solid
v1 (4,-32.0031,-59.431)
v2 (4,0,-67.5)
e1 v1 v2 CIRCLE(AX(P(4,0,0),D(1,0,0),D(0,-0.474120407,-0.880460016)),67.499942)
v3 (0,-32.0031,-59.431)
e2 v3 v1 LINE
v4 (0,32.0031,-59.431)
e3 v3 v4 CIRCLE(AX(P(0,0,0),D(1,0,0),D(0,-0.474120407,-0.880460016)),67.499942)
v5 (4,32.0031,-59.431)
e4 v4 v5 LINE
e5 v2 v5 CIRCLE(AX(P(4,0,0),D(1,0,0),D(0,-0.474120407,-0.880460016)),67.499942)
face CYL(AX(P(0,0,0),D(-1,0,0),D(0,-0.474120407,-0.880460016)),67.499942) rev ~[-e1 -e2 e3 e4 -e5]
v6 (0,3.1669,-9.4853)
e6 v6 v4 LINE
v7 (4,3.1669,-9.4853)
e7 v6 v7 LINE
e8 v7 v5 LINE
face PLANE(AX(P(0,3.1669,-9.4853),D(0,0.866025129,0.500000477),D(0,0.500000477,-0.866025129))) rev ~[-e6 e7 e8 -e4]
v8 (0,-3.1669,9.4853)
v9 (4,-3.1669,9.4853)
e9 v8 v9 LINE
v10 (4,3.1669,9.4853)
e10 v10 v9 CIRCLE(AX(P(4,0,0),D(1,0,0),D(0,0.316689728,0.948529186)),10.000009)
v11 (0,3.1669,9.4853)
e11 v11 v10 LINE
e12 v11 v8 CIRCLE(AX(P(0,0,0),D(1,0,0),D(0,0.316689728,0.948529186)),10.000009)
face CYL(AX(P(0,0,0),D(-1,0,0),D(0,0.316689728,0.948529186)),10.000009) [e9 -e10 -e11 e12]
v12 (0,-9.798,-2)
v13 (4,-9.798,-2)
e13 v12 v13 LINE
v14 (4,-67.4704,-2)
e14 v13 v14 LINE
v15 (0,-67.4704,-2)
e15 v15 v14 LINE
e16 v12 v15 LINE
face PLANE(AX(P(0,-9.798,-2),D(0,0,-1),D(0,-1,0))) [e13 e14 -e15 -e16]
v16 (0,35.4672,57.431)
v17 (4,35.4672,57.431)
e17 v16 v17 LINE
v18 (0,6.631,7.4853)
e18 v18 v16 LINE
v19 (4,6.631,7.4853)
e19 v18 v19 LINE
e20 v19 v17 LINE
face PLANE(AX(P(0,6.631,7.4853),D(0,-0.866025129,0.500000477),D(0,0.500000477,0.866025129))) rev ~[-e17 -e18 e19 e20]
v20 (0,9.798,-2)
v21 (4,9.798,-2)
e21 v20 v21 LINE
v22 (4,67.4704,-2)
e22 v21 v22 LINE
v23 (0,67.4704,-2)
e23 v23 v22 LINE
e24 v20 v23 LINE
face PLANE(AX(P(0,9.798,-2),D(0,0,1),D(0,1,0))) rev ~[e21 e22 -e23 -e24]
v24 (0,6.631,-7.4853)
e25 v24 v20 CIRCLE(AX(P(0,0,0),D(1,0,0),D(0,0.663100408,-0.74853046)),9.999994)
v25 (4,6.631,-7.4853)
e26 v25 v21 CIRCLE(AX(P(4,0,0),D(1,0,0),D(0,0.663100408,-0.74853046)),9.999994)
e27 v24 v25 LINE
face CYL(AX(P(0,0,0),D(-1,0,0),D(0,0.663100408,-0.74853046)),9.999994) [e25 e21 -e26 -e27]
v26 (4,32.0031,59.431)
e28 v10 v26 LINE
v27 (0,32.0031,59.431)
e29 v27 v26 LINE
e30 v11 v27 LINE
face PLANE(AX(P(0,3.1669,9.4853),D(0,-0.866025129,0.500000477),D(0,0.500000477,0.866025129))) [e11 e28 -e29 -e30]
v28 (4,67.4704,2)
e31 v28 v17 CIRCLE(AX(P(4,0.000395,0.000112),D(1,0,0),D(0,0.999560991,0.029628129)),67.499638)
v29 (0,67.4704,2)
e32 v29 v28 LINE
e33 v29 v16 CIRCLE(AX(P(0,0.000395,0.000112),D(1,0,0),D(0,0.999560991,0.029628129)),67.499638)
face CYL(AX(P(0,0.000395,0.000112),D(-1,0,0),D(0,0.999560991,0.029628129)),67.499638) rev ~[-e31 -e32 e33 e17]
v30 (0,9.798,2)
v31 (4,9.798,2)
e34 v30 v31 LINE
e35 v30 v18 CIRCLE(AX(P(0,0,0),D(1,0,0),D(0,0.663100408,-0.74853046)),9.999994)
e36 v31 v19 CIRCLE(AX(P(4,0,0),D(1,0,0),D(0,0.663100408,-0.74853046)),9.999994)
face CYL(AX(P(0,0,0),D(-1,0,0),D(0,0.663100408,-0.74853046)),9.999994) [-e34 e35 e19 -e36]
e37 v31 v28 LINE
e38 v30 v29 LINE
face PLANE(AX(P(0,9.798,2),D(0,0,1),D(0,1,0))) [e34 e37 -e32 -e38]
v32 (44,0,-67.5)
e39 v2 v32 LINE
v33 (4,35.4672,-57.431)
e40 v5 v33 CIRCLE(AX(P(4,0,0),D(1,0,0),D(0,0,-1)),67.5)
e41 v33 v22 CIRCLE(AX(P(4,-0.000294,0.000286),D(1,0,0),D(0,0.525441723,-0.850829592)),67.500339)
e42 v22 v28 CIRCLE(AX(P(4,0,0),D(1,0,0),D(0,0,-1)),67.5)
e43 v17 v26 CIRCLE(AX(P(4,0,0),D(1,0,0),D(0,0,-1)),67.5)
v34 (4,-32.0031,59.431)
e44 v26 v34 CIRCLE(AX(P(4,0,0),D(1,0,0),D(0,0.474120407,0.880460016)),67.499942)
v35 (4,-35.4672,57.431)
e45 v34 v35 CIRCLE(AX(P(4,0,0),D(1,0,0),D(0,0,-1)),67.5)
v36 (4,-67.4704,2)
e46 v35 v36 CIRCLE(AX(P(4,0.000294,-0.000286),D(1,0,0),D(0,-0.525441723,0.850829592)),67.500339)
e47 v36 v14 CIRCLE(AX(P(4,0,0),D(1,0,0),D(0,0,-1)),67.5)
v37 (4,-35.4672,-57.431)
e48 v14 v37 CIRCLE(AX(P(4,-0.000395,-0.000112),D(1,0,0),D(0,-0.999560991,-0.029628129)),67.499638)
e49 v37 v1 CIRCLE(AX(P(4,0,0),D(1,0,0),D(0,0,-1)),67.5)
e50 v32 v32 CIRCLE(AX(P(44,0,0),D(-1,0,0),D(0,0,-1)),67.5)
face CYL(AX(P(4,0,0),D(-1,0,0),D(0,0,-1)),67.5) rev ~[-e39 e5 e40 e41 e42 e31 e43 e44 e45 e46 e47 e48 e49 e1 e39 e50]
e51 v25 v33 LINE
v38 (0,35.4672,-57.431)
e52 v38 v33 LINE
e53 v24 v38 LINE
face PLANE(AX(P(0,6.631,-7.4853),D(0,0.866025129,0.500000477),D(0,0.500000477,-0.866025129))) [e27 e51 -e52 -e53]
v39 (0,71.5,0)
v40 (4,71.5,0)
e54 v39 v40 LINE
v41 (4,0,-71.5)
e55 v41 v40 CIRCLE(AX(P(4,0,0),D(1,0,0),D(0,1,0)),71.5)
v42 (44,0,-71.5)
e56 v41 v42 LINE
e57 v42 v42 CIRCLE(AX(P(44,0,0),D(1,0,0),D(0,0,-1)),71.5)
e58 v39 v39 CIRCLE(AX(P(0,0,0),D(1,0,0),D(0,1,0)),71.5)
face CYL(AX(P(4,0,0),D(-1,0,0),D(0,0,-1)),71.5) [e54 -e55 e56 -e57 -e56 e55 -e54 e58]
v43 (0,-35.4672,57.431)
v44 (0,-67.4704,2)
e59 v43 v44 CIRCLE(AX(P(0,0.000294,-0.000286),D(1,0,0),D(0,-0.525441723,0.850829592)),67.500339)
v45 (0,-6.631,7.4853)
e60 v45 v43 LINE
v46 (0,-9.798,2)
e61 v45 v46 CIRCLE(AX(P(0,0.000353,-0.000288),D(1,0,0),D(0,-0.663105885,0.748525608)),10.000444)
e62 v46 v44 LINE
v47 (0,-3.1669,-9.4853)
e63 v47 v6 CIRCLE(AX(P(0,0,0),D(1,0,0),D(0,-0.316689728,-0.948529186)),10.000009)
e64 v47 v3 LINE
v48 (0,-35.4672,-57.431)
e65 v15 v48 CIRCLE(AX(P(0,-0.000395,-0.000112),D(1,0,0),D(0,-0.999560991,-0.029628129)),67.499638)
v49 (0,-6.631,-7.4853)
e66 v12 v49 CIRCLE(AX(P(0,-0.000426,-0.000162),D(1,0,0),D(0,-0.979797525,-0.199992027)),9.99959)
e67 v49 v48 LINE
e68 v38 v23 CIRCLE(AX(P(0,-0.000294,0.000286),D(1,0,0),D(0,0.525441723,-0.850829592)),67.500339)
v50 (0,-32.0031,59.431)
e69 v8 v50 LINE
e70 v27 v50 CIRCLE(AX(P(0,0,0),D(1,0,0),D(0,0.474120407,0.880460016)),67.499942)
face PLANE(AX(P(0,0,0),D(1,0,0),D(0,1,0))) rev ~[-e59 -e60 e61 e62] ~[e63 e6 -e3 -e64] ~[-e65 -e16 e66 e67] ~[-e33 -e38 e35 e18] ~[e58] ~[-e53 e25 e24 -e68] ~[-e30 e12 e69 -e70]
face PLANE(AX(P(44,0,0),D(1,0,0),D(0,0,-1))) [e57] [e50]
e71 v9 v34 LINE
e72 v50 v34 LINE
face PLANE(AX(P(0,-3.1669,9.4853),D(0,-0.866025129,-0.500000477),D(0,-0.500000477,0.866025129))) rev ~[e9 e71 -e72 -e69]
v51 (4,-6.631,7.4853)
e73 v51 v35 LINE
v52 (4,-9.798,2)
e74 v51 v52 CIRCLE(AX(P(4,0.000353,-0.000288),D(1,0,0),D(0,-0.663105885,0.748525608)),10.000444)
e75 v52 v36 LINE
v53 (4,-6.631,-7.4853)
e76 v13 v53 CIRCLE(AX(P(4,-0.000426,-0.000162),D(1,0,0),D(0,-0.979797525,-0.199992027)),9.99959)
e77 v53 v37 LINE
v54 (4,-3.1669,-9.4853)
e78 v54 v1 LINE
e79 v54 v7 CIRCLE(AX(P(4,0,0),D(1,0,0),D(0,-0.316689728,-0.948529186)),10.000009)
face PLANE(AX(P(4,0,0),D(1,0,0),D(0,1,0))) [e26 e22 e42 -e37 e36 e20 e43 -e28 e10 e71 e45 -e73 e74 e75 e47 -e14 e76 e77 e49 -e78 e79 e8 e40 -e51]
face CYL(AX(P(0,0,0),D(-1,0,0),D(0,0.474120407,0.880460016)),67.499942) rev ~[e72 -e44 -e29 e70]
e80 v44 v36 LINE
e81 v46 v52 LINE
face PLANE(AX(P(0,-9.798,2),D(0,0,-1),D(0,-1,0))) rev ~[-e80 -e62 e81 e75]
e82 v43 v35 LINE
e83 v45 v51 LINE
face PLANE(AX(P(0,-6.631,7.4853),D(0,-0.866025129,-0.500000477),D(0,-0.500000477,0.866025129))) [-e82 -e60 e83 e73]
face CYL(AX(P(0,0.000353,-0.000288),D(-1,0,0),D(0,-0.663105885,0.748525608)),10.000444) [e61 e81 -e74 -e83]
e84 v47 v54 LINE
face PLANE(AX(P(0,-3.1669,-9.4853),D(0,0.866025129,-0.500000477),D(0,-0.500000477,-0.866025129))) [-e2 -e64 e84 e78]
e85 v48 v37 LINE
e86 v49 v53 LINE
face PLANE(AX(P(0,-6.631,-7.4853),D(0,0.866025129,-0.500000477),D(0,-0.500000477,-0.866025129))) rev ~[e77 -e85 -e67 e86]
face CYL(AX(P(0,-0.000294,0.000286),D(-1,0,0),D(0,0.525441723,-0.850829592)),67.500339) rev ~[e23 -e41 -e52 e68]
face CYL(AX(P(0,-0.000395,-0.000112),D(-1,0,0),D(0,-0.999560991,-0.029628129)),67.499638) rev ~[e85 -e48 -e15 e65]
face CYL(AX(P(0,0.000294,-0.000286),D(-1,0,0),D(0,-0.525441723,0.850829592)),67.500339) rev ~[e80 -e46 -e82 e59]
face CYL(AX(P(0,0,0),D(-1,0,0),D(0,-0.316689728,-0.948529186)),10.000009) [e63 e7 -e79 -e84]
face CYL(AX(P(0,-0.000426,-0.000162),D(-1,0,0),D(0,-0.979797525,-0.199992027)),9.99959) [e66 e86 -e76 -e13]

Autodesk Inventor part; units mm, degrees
ref_plane "YZ Plane" through (0, 0, 0) normal (1, 0, 0) x (0, 1, 0)
ref_plane "XZ Plane" through (0, 0, 0) normal (0, 1, 0) x (-1, 0, 0)
ref_plane "XY Plane" through (0, 0, 0) normal (0, 0, 1) x (1, 0, 0)
sketch "Sketch1" plane through (0, 0, 0) normal (1, 0, 0) x (0, 1, 0)
  arc A0 (35.4672, -57.431) -> (67.4704, -2) centre (0, 0) ccw
  circle A1 centre (0, 0) radius 71.5
  arc A2 (3.1669, 9.4853) -> (-3.1669, 9.4853) centre (0, 0) ccw
  line L0 (10, 0) -> (67.5, 0) construction
  line L1 (9.798, 2) -> (67.4704, 2)
  line L2 (9.798, -2) -> (67.4704, -2)
  line L3 (3.1669, 9.4853) -> (32.0031, 59.431)
  line L4 (6.631, 7.4853) -> (35.4672, 57.431)
  line L5 (-6.631, 7.4853) -> (-35.4672, 57.431)
  line L6 (-3.1669, 9.4853) -> (-32.0031, 59.431)
  line L7 (-9.798, -2) -> (-67.4704, -2)
  line L8 (-9.798, 2) -> (-67.4704, 2)
  line L9 (-3.1669, -9.4853) -> (-32.0031, -59.431)
  line L10 (-6.631, -7.4853) -> (-35.4672, -57.431)
  line L11 (6.631, -7.4853) -> (35.4672, -57.431)
  line L12 (3.1669, -9.4853) -> (32.0031, -59.431)
  arc A3 (6.631, 7.4853) -> (3.1669, 9.4853) centre (0, 0) ccw
  arc A4 (-6.631, 7.4853) -> (-9.798, 2) centre (0, 0) ccw
  arc A5 (-3.1669, 9.4853) -> (-6.631, 7.4853) centre (0, 0) ccw
  arc A6 (-9.798, 2) -> (-9.798, -2) centre (0, 0) ccw
  arc A7 (-9.798, -2) -> (-6.631, -7.4853) centre (0, 0) ccw
  arc A8 (-6.631, -7.4853) -> (-3.1669, -9.4853) centre (0, 0) ccw
  arc A9 (-3.1669, -9.4853) -> (3.1669, -9.4853) centre (0, 0) ccw
  arc A10 (3.1669, -9.4853) -> (6.631, -7.4853) centre (0, 0) ccw
  arc A11 (6.631, -7.4853) -> (6.631, 7.4853) centre (0, 0) ccw
  arc A12 (32.0031, -59.431) -> (35.4672, -57.431) centre (0, 0) ccw
  arc A13 (67.4704, -2) -> (67.4704, 2) centre (0, 0) ccw construction
  arc A14 (35.4672, 57.431) -> (32.0031, 59.431) centre (0, 0) ccw construction
  arc A15 (32.0031, 59.431) -> (-32.0031, 59.431) centre (0, 0) ccw
  arc A16 (-32.0031, 59.431) -> (-35.4672, 57.431) centre (0, 0) ccw construction
  arc A17 (-35.4672, 57.431) -> (-67.4704, 2) centre (0, 0) ccw
  arc A18 (-67.4704, 2) -> (-67.4704, -2) centre (0, 0) ccw construction
  arc A19 (-67.4704, -2) -> (-35.4672, -57.431) centre (0, 0) ccw
  arc A20 (-35.4672, -57.431) -> (-32.0031, -59.431) centre (0, 0) ccw construction
  arc A21 (-32.0031, -59.431) -> (32.0031, -59.431) centre (0, 0) ccw
  arc A22 (67.4704, 2) -> (35.4672, 57.431) centre (0, 0) ccw
  dimension "d0" = 135
  dimension "d1" = 4
  dimension "d2" = 20
  dimension "d3" = 2
  dimension "d4" = 2
  dimension "d7" = 360
extrude "Extrusion1" add sketch "Sketch1" along normal blind 4 contours A12 L12 A10 L11 | A10 A9 A8 A7 A6 A4 A5 A2 A3 A11 | A1
sketch "Sketch2" plane through (4, 0, 0) normal (1, 0, 0) x (0, 0, -1)
  circle A0 centre (0, 0) radius 71.5 projected
  line L0 (-59.431, 32.0031) -> (-9.4853, 3.1669) projected
  circle A1 centre (0, 0) radius 67.5
extrude "Extrusion2" add sketch "Sketch2" along normal blind 40
properties part number "SuportMotor"
